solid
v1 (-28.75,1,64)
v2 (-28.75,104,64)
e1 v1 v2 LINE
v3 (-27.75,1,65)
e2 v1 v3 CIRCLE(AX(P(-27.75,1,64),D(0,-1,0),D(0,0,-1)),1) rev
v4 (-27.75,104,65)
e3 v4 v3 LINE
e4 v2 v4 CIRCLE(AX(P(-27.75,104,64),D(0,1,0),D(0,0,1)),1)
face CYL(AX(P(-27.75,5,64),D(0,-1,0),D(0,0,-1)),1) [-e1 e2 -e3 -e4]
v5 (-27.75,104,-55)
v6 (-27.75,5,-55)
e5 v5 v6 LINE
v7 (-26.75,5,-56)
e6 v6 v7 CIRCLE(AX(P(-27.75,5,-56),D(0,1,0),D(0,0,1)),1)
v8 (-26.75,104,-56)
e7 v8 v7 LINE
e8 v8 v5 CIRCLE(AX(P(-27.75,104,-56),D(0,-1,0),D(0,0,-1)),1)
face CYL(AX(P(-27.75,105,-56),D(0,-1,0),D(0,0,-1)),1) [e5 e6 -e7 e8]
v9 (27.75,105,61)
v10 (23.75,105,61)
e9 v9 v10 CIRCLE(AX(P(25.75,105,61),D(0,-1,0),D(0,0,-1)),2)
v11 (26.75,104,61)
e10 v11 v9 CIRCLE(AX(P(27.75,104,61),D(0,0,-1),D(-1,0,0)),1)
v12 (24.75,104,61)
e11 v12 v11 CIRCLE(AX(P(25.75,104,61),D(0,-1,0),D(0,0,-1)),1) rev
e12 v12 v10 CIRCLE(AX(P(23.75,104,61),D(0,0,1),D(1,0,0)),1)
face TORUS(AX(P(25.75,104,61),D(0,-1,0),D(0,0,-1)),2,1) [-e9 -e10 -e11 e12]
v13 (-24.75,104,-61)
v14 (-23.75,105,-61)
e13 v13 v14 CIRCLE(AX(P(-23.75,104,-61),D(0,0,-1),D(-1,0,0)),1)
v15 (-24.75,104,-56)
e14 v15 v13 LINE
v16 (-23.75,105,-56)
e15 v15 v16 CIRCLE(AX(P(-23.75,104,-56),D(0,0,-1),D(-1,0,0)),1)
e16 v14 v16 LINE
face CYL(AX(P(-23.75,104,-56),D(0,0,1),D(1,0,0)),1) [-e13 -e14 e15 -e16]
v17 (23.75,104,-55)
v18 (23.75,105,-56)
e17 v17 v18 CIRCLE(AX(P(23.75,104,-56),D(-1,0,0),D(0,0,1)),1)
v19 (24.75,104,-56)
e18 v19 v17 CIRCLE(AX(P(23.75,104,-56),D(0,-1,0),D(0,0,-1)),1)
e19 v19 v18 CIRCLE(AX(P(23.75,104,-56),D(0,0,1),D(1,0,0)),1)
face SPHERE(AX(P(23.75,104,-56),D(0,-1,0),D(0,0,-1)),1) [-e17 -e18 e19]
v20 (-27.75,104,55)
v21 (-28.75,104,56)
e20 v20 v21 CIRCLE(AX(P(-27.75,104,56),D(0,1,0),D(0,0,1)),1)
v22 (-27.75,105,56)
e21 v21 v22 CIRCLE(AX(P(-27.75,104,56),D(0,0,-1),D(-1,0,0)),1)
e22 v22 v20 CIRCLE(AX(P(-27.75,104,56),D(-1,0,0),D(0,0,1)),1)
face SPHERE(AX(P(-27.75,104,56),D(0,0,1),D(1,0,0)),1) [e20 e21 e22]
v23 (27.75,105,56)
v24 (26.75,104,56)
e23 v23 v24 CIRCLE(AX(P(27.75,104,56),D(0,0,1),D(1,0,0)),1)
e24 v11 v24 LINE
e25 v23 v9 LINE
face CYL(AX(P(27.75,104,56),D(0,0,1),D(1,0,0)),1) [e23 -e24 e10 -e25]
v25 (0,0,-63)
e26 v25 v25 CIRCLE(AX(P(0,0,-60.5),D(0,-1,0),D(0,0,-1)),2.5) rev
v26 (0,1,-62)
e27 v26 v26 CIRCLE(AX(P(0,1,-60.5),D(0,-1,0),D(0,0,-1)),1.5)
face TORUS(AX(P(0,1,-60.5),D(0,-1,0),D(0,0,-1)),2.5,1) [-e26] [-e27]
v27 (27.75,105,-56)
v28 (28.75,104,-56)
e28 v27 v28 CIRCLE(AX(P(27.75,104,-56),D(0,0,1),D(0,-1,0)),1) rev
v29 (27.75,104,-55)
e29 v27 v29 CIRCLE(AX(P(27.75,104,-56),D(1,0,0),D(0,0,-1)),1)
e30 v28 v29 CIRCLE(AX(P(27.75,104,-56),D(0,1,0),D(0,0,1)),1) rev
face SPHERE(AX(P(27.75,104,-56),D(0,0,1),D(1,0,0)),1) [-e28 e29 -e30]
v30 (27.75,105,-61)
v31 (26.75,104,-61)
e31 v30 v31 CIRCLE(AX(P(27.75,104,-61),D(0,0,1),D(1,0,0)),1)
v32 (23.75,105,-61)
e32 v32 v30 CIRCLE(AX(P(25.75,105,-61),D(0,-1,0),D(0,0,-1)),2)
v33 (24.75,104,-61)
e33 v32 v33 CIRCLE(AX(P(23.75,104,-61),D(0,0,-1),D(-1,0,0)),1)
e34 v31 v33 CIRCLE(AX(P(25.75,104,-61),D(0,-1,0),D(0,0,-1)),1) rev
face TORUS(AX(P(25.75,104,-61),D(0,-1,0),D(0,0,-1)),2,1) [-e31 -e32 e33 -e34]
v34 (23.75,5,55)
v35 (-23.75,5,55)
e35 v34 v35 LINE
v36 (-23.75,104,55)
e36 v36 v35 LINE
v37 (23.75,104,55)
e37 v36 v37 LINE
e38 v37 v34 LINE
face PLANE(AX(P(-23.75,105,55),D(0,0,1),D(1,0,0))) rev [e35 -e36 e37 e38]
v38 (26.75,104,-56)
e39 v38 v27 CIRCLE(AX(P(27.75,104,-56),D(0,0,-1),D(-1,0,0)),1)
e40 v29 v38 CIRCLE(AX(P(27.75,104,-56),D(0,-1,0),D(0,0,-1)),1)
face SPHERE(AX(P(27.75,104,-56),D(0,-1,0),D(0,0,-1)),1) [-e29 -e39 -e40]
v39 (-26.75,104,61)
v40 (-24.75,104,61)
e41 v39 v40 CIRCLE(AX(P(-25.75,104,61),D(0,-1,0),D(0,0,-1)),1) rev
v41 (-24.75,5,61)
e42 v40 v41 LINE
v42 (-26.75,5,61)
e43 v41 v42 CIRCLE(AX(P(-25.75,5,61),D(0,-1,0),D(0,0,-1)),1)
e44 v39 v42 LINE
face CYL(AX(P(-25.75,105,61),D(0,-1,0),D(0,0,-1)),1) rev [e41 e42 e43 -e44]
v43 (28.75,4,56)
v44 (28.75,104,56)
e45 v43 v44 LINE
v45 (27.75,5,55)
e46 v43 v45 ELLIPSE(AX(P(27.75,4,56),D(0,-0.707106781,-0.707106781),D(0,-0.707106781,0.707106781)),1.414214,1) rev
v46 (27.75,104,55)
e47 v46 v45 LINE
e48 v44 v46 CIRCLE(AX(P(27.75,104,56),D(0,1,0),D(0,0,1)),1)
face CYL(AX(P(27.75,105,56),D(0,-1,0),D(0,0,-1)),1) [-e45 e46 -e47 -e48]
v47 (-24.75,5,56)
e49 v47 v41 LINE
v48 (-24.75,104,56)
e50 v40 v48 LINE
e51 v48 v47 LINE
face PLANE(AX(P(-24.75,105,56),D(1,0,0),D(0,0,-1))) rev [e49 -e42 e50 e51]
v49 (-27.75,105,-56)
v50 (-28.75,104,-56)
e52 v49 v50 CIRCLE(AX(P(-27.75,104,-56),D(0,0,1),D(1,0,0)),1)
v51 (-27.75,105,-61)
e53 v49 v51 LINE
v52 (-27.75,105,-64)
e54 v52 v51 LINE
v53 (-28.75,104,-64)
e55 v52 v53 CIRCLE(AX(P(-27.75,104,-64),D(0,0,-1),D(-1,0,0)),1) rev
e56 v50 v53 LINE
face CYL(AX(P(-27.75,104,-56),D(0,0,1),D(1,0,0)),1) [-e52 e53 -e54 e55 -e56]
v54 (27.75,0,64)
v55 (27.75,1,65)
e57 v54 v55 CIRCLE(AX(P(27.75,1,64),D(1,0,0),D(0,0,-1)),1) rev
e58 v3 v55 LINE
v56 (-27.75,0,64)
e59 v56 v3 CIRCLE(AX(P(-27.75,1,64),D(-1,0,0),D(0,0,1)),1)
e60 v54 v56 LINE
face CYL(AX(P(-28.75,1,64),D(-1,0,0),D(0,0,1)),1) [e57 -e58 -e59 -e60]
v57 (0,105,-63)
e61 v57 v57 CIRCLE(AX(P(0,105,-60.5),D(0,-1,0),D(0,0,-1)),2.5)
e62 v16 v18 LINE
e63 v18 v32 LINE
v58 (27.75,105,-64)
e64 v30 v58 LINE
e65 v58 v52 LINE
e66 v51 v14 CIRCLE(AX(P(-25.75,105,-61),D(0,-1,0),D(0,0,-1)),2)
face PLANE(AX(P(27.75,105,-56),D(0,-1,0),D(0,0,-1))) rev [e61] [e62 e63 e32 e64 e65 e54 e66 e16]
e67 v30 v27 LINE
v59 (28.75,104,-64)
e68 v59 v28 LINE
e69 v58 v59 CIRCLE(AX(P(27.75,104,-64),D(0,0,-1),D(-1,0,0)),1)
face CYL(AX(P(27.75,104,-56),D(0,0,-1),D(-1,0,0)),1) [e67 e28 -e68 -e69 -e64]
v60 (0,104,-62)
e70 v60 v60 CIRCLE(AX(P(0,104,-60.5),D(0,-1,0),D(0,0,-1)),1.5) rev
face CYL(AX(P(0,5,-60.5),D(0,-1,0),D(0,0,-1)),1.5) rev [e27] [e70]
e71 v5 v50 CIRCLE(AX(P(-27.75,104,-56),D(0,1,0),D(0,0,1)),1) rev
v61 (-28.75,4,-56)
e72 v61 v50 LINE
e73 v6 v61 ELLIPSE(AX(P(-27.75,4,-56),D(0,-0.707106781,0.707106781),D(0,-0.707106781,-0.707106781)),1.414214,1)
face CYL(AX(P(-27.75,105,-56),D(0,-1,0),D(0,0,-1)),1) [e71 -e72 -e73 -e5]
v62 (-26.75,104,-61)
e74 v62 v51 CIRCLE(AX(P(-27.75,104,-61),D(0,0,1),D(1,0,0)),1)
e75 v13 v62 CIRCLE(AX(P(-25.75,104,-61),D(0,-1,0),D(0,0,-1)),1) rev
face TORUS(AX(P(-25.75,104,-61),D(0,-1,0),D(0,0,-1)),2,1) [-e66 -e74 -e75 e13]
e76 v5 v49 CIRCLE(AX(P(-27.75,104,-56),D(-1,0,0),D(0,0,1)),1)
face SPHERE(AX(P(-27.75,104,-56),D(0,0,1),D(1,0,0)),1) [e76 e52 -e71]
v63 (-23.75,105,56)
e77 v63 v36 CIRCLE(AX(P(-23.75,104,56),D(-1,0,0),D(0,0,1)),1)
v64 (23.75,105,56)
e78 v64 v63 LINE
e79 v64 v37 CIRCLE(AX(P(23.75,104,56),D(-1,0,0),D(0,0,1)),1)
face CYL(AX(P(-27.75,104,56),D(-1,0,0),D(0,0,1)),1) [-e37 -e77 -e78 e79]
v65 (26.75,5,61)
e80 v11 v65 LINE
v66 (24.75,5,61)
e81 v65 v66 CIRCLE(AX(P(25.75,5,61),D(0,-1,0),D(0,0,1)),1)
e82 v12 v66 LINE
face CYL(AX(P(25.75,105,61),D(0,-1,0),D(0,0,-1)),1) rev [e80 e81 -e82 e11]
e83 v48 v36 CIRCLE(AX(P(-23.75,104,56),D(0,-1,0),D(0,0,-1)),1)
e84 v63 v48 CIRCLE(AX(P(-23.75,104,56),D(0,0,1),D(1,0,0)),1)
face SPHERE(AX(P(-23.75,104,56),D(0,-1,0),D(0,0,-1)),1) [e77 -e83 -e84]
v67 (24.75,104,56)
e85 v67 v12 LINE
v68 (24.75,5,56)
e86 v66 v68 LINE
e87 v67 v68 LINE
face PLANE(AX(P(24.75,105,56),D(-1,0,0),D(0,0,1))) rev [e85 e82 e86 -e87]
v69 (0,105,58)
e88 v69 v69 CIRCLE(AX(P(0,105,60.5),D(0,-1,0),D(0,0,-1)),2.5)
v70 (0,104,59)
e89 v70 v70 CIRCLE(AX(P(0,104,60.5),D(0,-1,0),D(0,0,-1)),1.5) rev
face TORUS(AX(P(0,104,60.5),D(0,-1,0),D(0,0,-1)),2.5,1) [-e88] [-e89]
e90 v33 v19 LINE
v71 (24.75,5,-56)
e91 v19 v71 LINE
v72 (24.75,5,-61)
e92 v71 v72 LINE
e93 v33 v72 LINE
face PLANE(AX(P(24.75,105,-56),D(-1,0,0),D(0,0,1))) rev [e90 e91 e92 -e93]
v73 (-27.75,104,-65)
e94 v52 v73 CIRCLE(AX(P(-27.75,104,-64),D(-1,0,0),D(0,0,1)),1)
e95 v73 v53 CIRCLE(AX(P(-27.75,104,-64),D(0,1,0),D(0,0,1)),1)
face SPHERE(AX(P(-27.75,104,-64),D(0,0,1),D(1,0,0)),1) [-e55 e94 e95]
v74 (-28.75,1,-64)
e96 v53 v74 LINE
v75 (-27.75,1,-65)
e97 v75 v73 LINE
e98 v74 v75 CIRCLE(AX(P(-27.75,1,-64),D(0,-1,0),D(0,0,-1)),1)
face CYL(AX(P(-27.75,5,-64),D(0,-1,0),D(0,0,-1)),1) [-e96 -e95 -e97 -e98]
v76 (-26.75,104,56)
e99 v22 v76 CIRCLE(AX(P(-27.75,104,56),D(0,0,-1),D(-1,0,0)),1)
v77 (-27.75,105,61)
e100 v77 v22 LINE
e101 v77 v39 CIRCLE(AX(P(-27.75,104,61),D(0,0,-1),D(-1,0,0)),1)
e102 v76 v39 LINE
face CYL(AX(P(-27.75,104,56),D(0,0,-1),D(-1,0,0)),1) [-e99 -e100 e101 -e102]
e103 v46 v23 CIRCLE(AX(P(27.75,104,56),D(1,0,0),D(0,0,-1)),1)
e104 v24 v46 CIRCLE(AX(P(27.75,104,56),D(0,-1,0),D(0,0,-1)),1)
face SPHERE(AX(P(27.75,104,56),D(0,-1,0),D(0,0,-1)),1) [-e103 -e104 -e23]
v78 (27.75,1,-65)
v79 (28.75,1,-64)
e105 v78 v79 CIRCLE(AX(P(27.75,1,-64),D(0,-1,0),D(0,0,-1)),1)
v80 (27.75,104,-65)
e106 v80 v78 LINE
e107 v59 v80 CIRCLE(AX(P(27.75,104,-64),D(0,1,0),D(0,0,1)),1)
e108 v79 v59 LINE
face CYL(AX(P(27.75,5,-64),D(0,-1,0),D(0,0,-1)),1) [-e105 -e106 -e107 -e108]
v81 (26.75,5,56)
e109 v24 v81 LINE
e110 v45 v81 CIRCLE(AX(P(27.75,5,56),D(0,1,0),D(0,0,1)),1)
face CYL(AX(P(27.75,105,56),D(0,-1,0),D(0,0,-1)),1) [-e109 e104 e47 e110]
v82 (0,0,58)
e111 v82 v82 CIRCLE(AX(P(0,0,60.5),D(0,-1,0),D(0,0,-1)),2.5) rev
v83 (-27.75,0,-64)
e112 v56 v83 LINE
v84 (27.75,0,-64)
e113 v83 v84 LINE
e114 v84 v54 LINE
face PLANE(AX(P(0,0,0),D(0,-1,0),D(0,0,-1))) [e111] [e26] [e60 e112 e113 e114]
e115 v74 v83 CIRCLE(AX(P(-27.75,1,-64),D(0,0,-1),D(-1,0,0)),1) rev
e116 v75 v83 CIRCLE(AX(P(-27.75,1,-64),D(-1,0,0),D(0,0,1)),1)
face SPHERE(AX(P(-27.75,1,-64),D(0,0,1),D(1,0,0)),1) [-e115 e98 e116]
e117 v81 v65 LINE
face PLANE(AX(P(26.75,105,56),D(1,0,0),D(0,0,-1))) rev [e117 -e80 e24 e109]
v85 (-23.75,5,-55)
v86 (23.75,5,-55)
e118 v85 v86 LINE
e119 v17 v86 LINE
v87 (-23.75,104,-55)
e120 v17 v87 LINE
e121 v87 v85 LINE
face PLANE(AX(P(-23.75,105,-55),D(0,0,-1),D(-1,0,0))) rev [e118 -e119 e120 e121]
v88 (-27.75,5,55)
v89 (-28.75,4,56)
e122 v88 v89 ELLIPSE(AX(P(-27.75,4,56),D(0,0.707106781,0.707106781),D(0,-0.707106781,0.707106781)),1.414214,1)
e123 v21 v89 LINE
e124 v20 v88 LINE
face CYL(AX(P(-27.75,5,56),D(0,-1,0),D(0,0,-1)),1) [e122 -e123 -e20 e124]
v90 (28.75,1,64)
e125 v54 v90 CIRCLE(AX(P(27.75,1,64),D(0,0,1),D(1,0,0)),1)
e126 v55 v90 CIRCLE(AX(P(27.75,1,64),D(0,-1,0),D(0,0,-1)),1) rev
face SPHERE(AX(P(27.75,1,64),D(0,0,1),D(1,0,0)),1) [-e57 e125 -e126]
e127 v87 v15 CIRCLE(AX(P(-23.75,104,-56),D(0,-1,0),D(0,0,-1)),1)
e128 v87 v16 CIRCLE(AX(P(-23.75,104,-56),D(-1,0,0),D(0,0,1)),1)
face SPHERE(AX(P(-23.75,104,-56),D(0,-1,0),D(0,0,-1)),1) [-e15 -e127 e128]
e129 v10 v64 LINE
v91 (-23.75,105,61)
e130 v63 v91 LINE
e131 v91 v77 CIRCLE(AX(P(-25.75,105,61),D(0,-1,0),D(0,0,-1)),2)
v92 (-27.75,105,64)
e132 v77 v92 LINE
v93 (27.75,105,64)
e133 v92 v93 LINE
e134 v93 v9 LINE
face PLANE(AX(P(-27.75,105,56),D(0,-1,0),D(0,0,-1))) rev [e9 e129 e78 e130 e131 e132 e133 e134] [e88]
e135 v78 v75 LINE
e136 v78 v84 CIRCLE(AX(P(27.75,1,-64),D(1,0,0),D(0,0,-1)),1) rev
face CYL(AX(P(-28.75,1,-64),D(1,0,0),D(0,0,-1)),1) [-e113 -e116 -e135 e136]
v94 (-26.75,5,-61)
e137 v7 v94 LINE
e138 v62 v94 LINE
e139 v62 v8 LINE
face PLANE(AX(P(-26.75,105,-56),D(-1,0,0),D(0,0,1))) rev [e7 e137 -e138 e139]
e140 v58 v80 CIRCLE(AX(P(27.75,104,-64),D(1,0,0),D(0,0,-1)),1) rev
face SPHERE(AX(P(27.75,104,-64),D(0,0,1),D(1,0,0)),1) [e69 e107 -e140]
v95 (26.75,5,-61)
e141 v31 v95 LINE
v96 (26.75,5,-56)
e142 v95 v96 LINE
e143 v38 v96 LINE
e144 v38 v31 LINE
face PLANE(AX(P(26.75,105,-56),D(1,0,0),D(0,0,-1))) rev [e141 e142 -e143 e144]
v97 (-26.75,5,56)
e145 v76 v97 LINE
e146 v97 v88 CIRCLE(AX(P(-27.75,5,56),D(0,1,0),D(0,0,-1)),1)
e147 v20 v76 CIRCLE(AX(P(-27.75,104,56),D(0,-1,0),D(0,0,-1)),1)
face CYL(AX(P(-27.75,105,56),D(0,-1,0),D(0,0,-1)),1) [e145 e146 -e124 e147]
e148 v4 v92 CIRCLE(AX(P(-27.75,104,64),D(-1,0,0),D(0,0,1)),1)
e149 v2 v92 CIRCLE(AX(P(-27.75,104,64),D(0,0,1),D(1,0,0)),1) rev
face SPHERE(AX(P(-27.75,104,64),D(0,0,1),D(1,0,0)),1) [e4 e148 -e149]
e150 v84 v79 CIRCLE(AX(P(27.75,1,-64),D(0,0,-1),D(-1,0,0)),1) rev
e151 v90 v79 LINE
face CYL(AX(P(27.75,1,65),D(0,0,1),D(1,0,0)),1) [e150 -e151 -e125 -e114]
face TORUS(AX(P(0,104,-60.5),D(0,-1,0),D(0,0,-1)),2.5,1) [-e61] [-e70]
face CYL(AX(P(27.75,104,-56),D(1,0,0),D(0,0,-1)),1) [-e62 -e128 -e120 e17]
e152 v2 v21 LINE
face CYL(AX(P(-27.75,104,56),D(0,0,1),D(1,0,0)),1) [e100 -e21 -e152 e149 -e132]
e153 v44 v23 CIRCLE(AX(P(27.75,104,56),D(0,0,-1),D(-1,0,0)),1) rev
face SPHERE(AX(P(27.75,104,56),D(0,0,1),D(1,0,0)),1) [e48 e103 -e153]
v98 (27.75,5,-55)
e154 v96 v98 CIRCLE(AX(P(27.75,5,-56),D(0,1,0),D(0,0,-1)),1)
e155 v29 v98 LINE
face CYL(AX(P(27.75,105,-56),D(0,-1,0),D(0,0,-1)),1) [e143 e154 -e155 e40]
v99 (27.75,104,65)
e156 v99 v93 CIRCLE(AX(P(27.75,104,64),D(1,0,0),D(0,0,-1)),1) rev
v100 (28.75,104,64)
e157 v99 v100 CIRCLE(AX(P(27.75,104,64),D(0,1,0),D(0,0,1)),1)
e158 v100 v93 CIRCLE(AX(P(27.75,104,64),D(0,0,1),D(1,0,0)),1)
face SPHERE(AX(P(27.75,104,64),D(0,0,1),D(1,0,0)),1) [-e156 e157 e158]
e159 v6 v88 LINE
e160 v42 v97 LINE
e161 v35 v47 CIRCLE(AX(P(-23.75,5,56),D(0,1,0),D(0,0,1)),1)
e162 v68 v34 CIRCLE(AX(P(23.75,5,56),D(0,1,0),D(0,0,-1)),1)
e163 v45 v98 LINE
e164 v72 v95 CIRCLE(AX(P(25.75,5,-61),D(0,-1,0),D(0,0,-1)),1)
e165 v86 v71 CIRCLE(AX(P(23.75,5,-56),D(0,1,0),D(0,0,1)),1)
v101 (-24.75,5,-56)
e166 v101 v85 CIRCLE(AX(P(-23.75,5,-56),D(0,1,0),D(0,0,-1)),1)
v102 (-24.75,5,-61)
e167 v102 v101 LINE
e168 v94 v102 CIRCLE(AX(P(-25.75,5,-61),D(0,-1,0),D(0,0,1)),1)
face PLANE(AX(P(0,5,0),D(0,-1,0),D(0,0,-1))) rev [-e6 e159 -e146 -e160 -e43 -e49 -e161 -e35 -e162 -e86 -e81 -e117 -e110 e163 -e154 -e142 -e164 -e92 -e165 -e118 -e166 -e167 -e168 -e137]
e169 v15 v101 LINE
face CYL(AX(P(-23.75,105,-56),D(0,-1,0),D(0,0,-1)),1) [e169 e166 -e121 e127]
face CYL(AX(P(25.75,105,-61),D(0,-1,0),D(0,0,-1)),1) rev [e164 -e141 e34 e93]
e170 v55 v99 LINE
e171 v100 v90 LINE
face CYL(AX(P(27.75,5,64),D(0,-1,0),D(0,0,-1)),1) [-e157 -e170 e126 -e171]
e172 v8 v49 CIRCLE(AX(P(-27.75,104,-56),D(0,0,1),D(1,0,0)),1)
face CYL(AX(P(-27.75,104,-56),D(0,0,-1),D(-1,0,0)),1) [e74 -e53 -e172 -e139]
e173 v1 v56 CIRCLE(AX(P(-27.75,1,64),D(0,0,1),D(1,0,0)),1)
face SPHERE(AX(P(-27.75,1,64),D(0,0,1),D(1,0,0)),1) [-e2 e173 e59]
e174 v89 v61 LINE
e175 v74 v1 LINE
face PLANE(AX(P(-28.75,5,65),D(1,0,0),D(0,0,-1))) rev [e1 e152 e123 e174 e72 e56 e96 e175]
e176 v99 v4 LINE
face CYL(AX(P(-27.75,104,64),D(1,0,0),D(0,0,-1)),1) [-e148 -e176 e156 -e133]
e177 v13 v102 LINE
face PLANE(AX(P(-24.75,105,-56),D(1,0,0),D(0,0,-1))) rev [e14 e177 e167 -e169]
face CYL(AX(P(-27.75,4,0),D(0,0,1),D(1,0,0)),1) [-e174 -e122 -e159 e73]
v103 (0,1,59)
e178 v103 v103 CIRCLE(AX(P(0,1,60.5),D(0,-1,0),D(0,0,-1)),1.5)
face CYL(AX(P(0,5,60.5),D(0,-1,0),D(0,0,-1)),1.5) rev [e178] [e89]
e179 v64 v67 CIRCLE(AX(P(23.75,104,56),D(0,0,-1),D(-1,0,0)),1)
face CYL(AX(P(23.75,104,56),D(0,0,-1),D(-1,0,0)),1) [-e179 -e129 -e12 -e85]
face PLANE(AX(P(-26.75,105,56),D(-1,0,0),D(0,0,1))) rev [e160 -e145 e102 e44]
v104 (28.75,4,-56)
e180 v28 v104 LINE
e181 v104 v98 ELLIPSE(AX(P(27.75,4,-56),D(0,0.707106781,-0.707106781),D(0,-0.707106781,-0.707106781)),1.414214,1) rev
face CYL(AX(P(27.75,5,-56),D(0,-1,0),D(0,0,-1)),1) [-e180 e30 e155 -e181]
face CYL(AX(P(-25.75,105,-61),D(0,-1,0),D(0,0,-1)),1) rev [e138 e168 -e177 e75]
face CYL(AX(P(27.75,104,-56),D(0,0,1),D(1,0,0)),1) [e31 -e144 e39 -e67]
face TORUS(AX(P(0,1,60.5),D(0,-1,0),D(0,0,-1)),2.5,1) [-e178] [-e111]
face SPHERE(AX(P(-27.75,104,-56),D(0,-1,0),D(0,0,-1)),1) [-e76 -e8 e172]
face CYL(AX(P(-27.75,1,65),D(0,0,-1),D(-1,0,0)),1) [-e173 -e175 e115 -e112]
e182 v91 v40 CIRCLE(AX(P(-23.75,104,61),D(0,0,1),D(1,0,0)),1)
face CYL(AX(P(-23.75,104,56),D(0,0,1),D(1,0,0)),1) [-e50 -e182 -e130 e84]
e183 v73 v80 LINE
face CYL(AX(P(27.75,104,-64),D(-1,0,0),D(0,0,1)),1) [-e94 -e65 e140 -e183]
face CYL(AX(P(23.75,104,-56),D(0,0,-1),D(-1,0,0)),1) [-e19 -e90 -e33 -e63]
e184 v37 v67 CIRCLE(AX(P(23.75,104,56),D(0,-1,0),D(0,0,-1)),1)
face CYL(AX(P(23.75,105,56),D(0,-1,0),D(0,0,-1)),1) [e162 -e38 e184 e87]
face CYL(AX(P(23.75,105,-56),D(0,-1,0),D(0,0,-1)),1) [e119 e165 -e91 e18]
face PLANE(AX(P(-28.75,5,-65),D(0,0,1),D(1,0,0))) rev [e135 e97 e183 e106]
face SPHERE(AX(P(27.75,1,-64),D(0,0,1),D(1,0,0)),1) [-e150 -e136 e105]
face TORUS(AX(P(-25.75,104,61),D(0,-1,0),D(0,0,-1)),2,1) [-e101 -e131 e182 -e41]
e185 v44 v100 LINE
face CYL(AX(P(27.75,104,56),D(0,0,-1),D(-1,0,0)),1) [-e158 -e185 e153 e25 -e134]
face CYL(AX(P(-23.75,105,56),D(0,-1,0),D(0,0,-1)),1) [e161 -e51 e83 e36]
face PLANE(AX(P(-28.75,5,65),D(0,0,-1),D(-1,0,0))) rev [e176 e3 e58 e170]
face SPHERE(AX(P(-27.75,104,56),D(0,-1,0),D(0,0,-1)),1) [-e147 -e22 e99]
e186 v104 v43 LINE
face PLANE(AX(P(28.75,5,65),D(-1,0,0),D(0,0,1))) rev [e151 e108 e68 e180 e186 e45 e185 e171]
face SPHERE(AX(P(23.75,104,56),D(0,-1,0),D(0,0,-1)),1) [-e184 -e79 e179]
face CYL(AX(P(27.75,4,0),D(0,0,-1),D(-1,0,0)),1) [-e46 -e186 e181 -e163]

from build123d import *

# Parameters (mm, degrees)
SKETCH4_W           = 57.5
SKETCH4_H           = 130
SKETCH4_R           = 1.5
BOSS_EXTRUDE3_DEPTH = 5
SKETCH5_R           = 1.5
BOSS_EXTRUDE4_DEPTH = 100
FILLET2_R           = 1


with BuildPart() as part:
    # Sketch4 → Boss-Extrude3 (new body)
    with BuildSketch(Plane(origin=(0, 0, 0), x_dir=(1, 0, 0), z_dir=(0, 1, 0))):
        Rectangle(SKETCH4_W, SKETCH4_H)
        with Locations(Location((0, -60.5, 0), (0, 0, 270))):
            Circle(SKETCH4_R, mode=Mode.SUBTRACT)
        with Locations(Location((0, 60.5, 0), (0, 0, 90))):
            Circle(SKETCH4_R, mode=Mode.SUBTRACT)
    extrude(amount=BOSS_EXTRUDE3_DEPTH)

    # Sketch5 → Boss-Extrude4 (add)
    # profile 1 of 2: a face of its own
    with BuildSketch(Plane(origin=(0, 5, 0), x_dir=(1, 0, 0), z_dir=(0, 1, 0))):
        with BuildLine():
            Line((27.75, -55), (28.75, -55))
            Line((28.75, -55), (28.75, -65))
            Line((28.75, -65), (-28.75, -65))
            Line((-28.75, -65), (-28.75, -55))
            Line((-28.75, -55), (-27.75, -55))
            ThreePointArc((-27.75, -55), (-27.042893219, -55.292893219), (-26.75, -56))
            Line((-26.75, -56), (-26.75, -61))
            ThreePointArc((-26.75, -61), (-25.75, -62), (-24.75, -61))
            Line((-24.75, -61), (-24.75, -56))
            ThreePointArc((-24.75, -56), (-24.457106781, -55.292893219), (-23.75, -55))
            Line((-23.75, -55), (23.75, -55))
            ThreePointArc((23.75, -55), (24.457106781, -55.292893219), (24.75, -56))
            Line((24.75, -56), (24.75, -61))
            ThreePointArc((24.75, -61), (25.75, -62), (26.75, -61))
            Line((26.75, -61), (26.75, -56))
            ThreePointArc((26.75, -56), (27.042893219, -55.292893219), (27.75, -55))
        make_face()
        with Locations(Location((0, -60.5, 0), (0, 0, 270))):
            Circle(SKETCH5_R, mode=Mode.SUBTRACT)
    # profile 2 of 2: a face of its own
    with BuildSketch(Plane(origin=(0, 5, 0), x_dir=(1, 0, 0), z_dir=(0, 1, 0))):
        with BuildLine():
            Line((28.75, 65), (28.75, 55))
            Line((28.75, 55), (27.75, 55))
            ThreePointArc((27.75, 55), (27.042893219, 55.292893219), (26.75, 56))
            Line((26.75, 56), (26.75, 61))
            ThreePointArc((26.75, 61), (25.75, 62), (24.75, 61))
            Line((24.75, 61), (24.75, 56))
            ThreePointArc((24.75, 56), (24.457106781, 55.292893219), (23.75, 55))
            Line((23.75, 55), (-23.75, 55))
            ThreePointArc((-23.75, 55), (-24.457106781, 55.292893219), (-24.75, 56))
            Line((-24.75, 56), (-24.75, 61))
            ThreePointArc((-24.75, 61), (-25.75, 62), (-26.75, 61))
            Line((-26.75, 61), (-26.75, 56))
            ThreePointArc((-26.75, 56), (-27.042893219, 55.292893219), (-27.75, 55))
            Line((-27.75, 55), (-28.75, 55))
            Line((-28.75, 55), (-28.75, 65))
            Line((-28.75, 65), (28.75, 65))
        make_face()
        with Locations(Location((0, 60.5, 0), (0, 0, 90))):
            Circle(SKETCH5_R, mode=Mode.SUBTRACT)
    extrude(amount=BOSS_EXTRUDE4_DEPTH)

    # Fillet2
    fillet2_edges = [part.edges().sort_by_distance(p)[0] for p in [
        (0, 0, -59),
        (0, 0, 59),
        (0, 105, 59),
        (-27.042893219, 105, 55.292893219),
        (-26.75, 105, 58.5),
        (-24.75, 105, 58.5),
        (-24.457106781, 105, 55.292893219),
        (0, 105, 55),
        (24.457106781, 105, 55.292893219),
        (24.75, 105, 58.5),
        (26.75, 105, 58.5),
        (27.042893219, 105, 55.292893219),
        (0, 105, 65),
        (0, 0, 65),
        (-28.75, 55, -55),
        (-28.75, 5, 0),
        (-28.75, 55, 55),
        (-28.75, 105, 60),
        (-28.75, 52.5, 65),
        (-28.75, 0, 0),
        (0, 105, -59),
        (27.042893219, 105, -55.292893219),
        (26.75, 105, -58.5),
        (24.75, 105, -58.5),
        (24.457106781, 105, -55.292893219),
        (0, 105, -55),
        (-24.457106781, 105, -55.292893219),
        (-24.75, 105, -58.5),
        (-26.75, 105, -58.5),
        (-27.042893219, 105, -55.292893219),
        (-28.75, 105, -60),
        (0, 105, -65),
        (-28.75, 52.5, -65),
        (0, 0, -65),
        (28.75, 52.5, 65),
        (28.75, 105, 60),
        (28.75, 55, 55),
        (28.75, 5, 0),
        (28.75, 55, -55),
        (28.75, 105, -60),
        (28.75, 52.5, -65),
        (28.75, 0, 0),
        (-25.75, 105, 62),
        (25.75, 105, 62),
        (25.75, 105, -62),
        (-25.75, 105, -62),
    ]]
    fillet(fillet2_edges, radius=FILLET2_R - 0.0001)  # a hair under: the kernel refuses the full size


solid = part.part
